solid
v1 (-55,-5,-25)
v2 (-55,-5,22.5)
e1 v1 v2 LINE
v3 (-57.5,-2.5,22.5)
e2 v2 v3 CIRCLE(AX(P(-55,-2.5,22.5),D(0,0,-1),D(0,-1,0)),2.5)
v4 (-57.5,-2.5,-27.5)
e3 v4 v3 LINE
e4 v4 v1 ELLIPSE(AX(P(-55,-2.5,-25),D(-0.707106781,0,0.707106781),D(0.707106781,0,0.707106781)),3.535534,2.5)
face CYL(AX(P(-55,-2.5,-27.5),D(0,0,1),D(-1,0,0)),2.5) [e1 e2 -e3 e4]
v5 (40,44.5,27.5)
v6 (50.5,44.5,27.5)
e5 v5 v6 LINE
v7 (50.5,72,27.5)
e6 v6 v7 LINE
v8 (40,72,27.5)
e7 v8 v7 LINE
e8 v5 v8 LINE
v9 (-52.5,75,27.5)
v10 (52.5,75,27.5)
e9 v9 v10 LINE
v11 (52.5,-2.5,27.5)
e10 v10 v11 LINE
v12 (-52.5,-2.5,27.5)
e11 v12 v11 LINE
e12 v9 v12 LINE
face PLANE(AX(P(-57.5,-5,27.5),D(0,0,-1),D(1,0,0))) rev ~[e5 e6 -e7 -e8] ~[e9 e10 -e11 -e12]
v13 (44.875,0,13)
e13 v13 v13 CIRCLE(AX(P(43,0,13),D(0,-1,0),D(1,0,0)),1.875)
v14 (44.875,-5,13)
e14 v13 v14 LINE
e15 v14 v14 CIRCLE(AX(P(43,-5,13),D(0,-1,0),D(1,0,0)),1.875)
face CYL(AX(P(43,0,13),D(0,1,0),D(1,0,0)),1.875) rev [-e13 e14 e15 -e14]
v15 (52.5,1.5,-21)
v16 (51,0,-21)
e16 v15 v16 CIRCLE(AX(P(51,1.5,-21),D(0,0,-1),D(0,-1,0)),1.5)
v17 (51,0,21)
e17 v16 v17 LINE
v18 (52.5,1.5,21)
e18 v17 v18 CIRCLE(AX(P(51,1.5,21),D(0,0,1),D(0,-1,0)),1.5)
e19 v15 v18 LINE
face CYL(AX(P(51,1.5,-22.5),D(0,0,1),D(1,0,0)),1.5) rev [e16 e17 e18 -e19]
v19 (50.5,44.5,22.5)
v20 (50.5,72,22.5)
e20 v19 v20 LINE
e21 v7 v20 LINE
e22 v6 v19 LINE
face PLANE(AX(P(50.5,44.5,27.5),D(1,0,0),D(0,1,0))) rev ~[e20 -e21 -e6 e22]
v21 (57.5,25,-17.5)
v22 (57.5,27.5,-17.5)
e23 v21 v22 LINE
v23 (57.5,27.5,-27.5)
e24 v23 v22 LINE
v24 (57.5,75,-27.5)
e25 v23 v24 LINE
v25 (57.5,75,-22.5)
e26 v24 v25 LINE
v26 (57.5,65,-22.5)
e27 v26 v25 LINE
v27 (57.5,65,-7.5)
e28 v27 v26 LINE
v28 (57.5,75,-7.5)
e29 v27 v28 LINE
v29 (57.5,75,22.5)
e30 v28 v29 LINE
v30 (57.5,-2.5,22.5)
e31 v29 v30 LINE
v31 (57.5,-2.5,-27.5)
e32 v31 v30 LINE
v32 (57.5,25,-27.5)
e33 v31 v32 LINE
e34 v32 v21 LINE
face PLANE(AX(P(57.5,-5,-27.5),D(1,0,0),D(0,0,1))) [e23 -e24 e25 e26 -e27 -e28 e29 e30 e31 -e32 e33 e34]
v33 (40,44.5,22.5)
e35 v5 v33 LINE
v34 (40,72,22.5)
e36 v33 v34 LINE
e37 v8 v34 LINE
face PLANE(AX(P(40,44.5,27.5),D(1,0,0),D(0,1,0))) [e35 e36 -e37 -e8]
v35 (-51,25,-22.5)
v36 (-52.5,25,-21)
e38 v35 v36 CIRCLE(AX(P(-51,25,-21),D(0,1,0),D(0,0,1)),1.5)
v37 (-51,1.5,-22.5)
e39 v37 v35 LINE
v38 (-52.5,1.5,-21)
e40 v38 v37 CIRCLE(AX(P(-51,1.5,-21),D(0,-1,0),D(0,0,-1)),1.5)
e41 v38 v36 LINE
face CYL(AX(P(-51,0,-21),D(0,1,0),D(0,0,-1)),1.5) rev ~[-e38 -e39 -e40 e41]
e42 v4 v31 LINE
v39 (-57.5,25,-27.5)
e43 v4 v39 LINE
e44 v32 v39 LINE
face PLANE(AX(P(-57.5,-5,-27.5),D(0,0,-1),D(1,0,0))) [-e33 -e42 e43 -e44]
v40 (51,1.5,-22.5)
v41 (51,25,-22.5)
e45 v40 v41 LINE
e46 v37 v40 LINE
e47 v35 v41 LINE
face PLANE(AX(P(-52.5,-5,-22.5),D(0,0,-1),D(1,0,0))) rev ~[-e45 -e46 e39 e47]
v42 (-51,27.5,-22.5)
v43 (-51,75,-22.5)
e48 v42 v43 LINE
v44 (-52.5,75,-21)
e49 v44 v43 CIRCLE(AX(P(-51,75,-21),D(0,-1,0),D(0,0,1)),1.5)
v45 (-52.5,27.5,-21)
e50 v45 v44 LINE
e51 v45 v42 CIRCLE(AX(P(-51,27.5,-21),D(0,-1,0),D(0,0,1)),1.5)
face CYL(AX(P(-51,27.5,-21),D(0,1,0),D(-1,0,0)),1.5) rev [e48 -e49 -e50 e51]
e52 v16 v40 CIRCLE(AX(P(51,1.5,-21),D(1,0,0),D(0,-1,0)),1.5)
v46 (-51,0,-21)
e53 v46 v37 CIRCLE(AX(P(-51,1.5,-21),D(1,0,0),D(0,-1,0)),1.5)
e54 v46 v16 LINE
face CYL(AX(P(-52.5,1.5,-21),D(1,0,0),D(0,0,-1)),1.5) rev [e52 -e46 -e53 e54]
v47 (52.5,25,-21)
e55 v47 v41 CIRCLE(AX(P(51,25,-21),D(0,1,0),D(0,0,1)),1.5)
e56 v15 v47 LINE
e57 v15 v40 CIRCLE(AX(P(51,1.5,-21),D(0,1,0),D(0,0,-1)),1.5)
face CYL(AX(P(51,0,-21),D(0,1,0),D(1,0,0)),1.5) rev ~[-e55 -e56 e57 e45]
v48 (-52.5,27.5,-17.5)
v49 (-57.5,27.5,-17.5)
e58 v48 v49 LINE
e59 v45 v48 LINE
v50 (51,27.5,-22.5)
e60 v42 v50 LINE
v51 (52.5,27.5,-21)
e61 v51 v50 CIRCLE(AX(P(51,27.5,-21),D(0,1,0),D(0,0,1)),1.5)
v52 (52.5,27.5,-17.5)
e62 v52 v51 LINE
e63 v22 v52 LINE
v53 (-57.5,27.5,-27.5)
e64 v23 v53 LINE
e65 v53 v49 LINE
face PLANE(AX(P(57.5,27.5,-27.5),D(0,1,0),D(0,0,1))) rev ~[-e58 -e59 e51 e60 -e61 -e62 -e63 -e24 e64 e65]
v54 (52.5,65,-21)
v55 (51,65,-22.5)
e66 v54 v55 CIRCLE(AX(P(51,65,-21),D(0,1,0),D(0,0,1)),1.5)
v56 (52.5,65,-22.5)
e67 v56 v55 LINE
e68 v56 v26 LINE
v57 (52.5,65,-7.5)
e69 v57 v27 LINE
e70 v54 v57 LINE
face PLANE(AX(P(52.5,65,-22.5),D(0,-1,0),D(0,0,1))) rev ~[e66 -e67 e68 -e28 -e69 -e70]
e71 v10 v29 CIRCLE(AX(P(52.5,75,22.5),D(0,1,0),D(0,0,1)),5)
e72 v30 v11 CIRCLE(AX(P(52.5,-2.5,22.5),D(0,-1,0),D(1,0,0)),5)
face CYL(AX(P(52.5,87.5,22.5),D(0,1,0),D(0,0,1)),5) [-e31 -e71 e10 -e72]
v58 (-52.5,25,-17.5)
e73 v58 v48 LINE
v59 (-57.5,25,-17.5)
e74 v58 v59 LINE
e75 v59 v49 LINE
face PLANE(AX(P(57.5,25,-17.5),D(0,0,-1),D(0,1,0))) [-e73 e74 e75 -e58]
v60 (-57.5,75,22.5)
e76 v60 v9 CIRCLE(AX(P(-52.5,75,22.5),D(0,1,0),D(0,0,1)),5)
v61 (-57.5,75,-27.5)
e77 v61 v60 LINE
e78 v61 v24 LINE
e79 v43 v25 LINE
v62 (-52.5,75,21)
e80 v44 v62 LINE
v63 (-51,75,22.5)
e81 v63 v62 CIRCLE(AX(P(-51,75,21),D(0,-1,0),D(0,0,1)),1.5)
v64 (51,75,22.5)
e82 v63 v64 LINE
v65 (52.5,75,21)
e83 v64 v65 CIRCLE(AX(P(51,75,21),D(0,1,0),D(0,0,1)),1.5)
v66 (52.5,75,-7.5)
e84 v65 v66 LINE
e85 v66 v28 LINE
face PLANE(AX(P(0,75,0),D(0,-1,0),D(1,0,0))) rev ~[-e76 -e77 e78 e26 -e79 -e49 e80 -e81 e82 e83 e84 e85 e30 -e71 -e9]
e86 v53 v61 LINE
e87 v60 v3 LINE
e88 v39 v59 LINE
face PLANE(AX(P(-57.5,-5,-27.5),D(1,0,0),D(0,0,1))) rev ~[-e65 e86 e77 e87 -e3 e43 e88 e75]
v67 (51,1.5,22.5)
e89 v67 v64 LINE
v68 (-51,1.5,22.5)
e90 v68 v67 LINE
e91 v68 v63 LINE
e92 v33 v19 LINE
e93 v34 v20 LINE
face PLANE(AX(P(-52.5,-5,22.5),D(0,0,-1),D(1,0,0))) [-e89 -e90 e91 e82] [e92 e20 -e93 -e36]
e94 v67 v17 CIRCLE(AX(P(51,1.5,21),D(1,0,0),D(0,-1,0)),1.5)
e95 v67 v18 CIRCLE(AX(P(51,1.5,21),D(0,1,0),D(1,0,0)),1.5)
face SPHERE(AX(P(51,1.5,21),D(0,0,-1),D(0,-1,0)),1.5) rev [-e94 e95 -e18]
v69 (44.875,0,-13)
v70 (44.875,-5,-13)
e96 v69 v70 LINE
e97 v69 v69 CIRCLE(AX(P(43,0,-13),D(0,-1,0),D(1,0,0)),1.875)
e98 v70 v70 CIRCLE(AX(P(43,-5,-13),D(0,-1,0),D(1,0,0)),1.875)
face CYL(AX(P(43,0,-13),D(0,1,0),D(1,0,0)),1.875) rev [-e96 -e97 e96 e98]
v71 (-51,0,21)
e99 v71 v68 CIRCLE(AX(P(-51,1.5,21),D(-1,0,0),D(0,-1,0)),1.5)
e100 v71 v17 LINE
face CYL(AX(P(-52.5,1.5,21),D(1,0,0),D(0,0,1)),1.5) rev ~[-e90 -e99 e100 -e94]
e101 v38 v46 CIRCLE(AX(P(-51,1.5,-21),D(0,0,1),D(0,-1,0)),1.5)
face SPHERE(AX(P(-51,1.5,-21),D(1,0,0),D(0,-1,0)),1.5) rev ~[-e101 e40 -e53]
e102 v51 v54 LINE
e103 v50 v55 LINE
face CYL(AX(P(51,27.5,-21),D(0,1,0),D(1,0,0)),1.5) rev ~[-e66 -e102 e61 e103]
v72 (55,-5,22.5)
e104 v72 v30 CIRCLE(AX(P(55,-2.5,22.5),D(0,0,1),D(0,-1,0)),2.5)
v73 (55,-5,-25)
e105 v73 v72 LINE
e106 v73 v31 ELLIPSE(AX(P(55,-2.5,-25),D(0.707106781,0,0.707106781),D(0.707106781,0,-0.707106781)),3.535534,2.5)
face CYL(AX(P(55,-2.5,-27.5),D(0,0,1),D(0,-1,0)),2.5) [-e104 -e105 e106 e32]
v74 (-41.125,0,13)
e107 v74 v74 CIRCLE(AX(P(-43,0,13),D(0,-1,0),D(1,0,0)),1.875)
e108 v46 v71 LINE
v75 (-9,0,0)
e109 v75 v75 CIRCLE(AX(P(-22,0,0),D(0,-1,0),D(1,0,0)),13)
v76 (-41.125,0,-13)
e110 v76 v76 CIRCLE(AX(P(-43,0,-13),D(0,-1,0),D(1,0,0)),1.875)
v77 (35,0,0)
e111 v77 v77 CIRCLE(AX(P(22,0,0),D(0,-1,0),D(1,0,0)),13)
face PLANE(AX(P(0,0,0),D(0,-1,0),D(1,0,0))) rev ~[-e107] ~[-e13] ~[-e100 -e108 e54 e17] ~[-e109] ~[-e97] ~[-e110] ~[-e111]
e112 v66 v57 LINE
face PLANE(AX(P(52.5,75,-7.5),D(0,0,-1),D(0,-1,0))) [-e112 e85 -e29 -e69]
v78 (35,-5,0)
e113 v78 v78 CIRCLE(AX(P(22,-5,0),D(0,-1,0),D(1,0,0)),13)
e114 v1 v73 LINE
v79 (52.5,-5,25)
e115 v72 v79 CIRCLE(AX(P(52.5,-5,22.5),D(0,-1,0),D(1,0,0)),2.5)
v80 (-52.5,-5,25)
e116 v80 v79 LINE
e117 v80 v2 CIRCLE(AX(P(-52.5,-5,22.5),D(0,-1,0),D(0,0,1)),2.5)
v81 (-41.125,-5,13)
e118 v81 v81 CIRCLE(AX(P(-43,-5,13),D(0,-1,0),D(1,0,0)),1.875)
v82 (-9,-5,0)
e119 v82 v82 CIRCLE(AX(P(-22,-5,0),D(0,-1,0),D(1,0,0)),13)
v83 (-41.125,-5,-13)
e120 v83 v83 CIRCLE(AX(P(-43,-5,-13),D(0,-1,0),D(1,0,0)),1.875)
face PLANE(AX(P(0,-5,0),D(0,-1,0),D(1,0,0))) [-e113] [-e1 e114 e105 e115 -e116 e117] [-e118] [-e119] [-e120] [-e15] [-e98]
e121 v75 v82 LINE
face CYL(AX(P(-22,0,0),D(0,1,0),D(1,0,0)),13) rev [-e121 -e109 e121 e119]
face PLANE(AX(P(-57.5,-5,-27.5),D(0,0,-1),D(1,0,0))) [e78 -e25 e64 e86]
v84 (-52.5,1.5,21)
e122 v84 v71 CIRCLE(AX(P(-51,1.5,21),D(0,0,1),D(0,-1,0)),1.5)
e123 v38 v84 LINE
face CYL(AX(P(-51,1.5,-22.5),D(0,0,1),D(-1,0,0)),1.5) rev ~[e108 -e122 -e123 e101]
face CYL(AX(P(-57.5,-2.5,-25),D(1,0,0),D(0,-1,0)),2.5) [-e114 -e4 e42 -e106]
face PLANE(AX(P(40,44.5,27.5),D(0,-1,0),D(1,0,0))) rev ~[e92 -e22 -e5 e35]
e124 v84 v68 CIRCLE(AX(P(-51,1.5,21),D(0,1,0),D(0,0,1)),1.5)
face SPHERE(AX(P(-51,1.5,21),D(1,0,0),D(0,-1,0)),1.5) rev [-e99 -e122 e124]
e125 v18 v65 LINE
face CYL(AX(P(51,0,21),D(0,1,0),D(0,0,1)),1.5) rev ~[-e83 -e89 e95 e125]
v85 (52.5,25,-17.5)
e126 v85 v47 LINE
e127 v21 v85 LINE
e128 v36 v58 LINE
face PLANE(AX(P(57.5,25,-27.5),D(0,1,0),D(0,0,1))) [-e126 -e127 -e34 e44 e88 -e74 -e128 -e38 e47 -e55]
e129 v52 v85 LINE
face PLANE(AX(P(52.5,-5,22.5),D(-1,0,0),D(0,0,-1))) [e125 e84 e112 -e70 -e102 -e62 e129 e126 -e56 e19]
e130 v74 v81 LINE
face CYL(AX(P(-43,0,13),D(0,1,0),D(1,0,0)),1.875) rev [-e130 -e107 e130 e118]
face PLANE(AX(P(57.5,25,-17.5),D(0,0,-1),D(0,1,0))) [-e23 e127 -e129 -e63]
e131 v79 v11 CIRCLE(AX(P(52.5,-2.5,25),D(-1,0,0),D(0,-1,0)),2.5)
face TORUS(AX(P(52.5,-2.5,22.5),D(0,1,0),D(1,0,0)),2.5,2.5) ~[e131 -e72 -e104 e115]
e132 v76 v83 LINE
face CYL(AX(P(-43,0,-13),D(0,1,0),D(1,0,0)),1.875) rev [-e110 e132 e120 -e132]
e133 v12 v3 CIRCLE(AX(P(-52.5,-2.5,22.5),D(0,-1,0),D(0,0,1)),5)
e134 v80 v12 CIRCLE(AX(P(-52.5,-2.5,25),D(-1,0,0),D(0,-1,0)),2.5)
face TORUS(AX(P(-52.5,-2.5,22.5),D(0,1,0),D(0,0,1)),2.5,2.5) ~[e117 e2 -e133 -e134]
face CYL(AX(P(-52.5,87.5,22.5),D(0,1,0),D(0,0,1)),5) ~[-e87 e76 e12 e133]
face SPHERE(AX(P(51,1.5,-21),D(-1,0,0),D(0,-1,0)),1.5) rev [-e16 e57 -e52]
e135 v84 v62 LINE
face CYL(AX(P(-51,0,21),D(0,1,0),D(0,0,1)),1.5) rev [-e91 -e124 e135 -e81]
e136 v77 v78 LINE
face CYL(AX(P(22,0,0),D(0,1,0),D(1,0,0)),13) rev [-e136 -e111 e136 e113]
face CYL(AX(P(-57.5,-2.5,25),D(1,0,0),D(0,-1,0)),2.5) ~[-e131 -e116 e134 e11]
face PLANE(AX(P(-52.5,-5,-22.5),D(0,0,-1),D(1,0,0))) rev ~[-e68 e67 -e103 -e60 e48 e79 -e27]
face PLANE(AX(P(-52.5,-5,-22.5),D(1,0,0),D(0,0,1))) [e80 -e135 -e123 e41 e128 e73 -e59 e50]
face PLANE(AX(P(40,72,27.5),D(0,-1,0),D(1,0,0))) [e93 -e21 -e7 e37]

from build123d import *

# Parameters (mm, degrees)
F0_W        = 105
F0_H        = 45
F0_R        = 1.875
F0_R_2      = 13
F1_DEPTH    = 5
F2_W        = 115
F2_H        = 55
F2_W_2      = 105
F2_H_2      = 4.9815587699
F3_DEPTH    = 80
F4_W        = 2.5
F4_H        = 10
F5_DEPTH    = 115.001
F6_R        = 2.5
F7_T1_DEPTH = 92.5
F7_T4_ANGLE = 90
F7_T6_ANGLE = 90
F8_W        = 10.5
F8_H        = 27.5
F9_DEPTH    = 5
F10_W       = 10
F10_H       = 15
F11_DEPTH   = 5.001
F12_R       = 1.5


# Not quite as in the source:
# - a fillet or chamfer that OpenCascade refuses, or shapes differently, is made with other operations: its cross-section is extruded or revolved along the edge and cut away or added


with BuildPart() as f1:
    # F0 (on Front) → F1 (new body)
    with BuildSketch(Plane.XZ):
        Rectangle(F0_W, F0_H)
        with Locations((-43, -13)):
            Circle(F0_R, mode=Mode.SUBTRACT)
        with Locations((43, -13)):
            Circle(F0_R, mode=Mode.SUBTRACT)
        with Locations((-22, 0)):
            Circle(F0_R_2, mode=Mode.SUBTRACT)
        with Locations((-43, 13)):
            Circle(F0_R, mode=Mode.SUBTRACT)
        with Locations((22, 0)):
            Circle(F0_R_2, mode=Mode.SUBTRACT)
        with Locations((43, 13)):
            Circle(F0_R, mode=Mode.SUBTRACT)
    extrude(amount=F1_DEPTH)

    # F2 (on face) → F3 (join)
    with BuildSketch(Plane.XZ.offset(5)):
        Rectangle(F2_W, F2_H)
        Polygon((-52.5, -22.5), (-52.5, 22.5), (52.5, 22.5), (52.5, -22.5), (52.5, -27.4815587699), (-52.5, -27.4815587699), align=None, mode=Mode.SUBTRACT)
        with Locations((0, -24.990779385)):
            Rectangle(F2_W_2, F2_H_2)
    extrude(amount=-F3_DEPTH)

    # F4 (on face) → F5 (cut, through all)
    with BuildSketch(Plane.YZ.offset(57.5)):
        with Locations((26.25, -22.5)):
            Rectangle(F4_W, F4_H)
    extrude(amount=-F5_DEPTH, mode=Mode.SUBTRACT)

    # F6
    f6_edges = [f1.edges().sort_by_distance(p)[0] for p in [
        (0, -5, 27.5),
        (-57.5, -5, 0),
        (0, -5, -27.5),
        (57.5, -5, 0),
    ]]
    fillet(f6_edges, radius=F6_R)

    # F7: fillet of radius 5 on 2 edges, made by hand

    # F7_s2 → F7_t1 (cut)
    with BuildSketch(Plane.XZ.offset(-87.5)):
        with BuildLine():
            ThreePointArc((-52.5, 27.5), (-56.0355339059, 26.0355339059), (-57.5, 22.5))
            Line((-57.5, 22.5), (-57.5, 27.5))
            Line((-57.5, 27.5), (-52.5, 27.5))
        make_face()
        with BuildLine():
            ThreePointArc((52.5, 27.5), (56.0355339059, 26.0355339059), (57.5, 22.5))
            Line((57.5, 22.5), (57.5, 27.5))
            Line((57.5, 27.5), (52.5, 27.5))
        make_face()
    extrude(amount=F7_T1_DEPTH, mode=Mode.SUBTRACT)

    # F7_s3 → F7_t4 (revolve, cut)
    with BuildSketch(Plane.XY.offset(22.5)):
        with BuildLine():
            ThreePointArc((55, -5), (56.767766953, -4.267766953), (57.5, -2.5))
            Line((57.5, -2.5), (57.5, -5))
            Line((57.5, -5), (55, -5))
        make_face()
    revolve(axis=Axis((52.5, -5, 22.5), (0, -1, 0)), revolution_arc=F7_T4_ANGLE, mode=Mode.SUBTRACT)

    # F7_s5 → F7_t6 (revolve, cut)
    with BuildSketch(Plane.YZ.offset(-52.5)):
        with BuildLine():
            ThreePointArc((-5, 25), (-4.267766953, 26.767766953), (-2.5, 27.5))
            Line((-2.5, 27.5), (-5, 27.5))
            Line((-5, 27.5), (-5, 25))
        make_face()
    revolve(axis=Axis((-52.5, -5, 22.5), (0, -1, 0)), revolution_arc=F7_T6_ANGLE, mode=Mode.SUBTRACT)

    # F8 (on face) → F9 (cut, through all)
    with BuildSketch(Plane.XY.offset(27.5)):
        with Locations((45.25, 58.25)):
            Rectangle(F8_W, F8_H)
    extrude(amount=-F9_DEPTH, mode=Mode.SUBTRACT)

    # F10 (on face) → F11 (cut, through all)
    with BuildSketch(Plane(origin=(52.5, 0, 0), x_dir=(0, -1, 0), z_dir=(-1, 0, 0))):
        with Locations((-70, -15)):
            Rectangle(F10_W, F10_H)
    extrude(amount=-F11_DEPTH, mode=Mode.SUBTRACT)

    # F12
    f12_edges = [f1.edges().sort_by_distance(p)[0] for p in [
        (0, 0, -22.5),
        (52.5, 0, 0),
        (0, 0, 22.5),
        (-52.5, 0, 0),
        (-52.5, 37.5, 22.5),
        (52.5, 37.5, 22.5),
        (52.5, 12.5, -22.5),
        (52.5, 46.25, -22.5),
        (-52.5, 12.5, -22.5),
        (-52.5, 51.25, -22.5),
    ]]
    fillet(f12_edges, radius=F12_R)


solid = f1.part
